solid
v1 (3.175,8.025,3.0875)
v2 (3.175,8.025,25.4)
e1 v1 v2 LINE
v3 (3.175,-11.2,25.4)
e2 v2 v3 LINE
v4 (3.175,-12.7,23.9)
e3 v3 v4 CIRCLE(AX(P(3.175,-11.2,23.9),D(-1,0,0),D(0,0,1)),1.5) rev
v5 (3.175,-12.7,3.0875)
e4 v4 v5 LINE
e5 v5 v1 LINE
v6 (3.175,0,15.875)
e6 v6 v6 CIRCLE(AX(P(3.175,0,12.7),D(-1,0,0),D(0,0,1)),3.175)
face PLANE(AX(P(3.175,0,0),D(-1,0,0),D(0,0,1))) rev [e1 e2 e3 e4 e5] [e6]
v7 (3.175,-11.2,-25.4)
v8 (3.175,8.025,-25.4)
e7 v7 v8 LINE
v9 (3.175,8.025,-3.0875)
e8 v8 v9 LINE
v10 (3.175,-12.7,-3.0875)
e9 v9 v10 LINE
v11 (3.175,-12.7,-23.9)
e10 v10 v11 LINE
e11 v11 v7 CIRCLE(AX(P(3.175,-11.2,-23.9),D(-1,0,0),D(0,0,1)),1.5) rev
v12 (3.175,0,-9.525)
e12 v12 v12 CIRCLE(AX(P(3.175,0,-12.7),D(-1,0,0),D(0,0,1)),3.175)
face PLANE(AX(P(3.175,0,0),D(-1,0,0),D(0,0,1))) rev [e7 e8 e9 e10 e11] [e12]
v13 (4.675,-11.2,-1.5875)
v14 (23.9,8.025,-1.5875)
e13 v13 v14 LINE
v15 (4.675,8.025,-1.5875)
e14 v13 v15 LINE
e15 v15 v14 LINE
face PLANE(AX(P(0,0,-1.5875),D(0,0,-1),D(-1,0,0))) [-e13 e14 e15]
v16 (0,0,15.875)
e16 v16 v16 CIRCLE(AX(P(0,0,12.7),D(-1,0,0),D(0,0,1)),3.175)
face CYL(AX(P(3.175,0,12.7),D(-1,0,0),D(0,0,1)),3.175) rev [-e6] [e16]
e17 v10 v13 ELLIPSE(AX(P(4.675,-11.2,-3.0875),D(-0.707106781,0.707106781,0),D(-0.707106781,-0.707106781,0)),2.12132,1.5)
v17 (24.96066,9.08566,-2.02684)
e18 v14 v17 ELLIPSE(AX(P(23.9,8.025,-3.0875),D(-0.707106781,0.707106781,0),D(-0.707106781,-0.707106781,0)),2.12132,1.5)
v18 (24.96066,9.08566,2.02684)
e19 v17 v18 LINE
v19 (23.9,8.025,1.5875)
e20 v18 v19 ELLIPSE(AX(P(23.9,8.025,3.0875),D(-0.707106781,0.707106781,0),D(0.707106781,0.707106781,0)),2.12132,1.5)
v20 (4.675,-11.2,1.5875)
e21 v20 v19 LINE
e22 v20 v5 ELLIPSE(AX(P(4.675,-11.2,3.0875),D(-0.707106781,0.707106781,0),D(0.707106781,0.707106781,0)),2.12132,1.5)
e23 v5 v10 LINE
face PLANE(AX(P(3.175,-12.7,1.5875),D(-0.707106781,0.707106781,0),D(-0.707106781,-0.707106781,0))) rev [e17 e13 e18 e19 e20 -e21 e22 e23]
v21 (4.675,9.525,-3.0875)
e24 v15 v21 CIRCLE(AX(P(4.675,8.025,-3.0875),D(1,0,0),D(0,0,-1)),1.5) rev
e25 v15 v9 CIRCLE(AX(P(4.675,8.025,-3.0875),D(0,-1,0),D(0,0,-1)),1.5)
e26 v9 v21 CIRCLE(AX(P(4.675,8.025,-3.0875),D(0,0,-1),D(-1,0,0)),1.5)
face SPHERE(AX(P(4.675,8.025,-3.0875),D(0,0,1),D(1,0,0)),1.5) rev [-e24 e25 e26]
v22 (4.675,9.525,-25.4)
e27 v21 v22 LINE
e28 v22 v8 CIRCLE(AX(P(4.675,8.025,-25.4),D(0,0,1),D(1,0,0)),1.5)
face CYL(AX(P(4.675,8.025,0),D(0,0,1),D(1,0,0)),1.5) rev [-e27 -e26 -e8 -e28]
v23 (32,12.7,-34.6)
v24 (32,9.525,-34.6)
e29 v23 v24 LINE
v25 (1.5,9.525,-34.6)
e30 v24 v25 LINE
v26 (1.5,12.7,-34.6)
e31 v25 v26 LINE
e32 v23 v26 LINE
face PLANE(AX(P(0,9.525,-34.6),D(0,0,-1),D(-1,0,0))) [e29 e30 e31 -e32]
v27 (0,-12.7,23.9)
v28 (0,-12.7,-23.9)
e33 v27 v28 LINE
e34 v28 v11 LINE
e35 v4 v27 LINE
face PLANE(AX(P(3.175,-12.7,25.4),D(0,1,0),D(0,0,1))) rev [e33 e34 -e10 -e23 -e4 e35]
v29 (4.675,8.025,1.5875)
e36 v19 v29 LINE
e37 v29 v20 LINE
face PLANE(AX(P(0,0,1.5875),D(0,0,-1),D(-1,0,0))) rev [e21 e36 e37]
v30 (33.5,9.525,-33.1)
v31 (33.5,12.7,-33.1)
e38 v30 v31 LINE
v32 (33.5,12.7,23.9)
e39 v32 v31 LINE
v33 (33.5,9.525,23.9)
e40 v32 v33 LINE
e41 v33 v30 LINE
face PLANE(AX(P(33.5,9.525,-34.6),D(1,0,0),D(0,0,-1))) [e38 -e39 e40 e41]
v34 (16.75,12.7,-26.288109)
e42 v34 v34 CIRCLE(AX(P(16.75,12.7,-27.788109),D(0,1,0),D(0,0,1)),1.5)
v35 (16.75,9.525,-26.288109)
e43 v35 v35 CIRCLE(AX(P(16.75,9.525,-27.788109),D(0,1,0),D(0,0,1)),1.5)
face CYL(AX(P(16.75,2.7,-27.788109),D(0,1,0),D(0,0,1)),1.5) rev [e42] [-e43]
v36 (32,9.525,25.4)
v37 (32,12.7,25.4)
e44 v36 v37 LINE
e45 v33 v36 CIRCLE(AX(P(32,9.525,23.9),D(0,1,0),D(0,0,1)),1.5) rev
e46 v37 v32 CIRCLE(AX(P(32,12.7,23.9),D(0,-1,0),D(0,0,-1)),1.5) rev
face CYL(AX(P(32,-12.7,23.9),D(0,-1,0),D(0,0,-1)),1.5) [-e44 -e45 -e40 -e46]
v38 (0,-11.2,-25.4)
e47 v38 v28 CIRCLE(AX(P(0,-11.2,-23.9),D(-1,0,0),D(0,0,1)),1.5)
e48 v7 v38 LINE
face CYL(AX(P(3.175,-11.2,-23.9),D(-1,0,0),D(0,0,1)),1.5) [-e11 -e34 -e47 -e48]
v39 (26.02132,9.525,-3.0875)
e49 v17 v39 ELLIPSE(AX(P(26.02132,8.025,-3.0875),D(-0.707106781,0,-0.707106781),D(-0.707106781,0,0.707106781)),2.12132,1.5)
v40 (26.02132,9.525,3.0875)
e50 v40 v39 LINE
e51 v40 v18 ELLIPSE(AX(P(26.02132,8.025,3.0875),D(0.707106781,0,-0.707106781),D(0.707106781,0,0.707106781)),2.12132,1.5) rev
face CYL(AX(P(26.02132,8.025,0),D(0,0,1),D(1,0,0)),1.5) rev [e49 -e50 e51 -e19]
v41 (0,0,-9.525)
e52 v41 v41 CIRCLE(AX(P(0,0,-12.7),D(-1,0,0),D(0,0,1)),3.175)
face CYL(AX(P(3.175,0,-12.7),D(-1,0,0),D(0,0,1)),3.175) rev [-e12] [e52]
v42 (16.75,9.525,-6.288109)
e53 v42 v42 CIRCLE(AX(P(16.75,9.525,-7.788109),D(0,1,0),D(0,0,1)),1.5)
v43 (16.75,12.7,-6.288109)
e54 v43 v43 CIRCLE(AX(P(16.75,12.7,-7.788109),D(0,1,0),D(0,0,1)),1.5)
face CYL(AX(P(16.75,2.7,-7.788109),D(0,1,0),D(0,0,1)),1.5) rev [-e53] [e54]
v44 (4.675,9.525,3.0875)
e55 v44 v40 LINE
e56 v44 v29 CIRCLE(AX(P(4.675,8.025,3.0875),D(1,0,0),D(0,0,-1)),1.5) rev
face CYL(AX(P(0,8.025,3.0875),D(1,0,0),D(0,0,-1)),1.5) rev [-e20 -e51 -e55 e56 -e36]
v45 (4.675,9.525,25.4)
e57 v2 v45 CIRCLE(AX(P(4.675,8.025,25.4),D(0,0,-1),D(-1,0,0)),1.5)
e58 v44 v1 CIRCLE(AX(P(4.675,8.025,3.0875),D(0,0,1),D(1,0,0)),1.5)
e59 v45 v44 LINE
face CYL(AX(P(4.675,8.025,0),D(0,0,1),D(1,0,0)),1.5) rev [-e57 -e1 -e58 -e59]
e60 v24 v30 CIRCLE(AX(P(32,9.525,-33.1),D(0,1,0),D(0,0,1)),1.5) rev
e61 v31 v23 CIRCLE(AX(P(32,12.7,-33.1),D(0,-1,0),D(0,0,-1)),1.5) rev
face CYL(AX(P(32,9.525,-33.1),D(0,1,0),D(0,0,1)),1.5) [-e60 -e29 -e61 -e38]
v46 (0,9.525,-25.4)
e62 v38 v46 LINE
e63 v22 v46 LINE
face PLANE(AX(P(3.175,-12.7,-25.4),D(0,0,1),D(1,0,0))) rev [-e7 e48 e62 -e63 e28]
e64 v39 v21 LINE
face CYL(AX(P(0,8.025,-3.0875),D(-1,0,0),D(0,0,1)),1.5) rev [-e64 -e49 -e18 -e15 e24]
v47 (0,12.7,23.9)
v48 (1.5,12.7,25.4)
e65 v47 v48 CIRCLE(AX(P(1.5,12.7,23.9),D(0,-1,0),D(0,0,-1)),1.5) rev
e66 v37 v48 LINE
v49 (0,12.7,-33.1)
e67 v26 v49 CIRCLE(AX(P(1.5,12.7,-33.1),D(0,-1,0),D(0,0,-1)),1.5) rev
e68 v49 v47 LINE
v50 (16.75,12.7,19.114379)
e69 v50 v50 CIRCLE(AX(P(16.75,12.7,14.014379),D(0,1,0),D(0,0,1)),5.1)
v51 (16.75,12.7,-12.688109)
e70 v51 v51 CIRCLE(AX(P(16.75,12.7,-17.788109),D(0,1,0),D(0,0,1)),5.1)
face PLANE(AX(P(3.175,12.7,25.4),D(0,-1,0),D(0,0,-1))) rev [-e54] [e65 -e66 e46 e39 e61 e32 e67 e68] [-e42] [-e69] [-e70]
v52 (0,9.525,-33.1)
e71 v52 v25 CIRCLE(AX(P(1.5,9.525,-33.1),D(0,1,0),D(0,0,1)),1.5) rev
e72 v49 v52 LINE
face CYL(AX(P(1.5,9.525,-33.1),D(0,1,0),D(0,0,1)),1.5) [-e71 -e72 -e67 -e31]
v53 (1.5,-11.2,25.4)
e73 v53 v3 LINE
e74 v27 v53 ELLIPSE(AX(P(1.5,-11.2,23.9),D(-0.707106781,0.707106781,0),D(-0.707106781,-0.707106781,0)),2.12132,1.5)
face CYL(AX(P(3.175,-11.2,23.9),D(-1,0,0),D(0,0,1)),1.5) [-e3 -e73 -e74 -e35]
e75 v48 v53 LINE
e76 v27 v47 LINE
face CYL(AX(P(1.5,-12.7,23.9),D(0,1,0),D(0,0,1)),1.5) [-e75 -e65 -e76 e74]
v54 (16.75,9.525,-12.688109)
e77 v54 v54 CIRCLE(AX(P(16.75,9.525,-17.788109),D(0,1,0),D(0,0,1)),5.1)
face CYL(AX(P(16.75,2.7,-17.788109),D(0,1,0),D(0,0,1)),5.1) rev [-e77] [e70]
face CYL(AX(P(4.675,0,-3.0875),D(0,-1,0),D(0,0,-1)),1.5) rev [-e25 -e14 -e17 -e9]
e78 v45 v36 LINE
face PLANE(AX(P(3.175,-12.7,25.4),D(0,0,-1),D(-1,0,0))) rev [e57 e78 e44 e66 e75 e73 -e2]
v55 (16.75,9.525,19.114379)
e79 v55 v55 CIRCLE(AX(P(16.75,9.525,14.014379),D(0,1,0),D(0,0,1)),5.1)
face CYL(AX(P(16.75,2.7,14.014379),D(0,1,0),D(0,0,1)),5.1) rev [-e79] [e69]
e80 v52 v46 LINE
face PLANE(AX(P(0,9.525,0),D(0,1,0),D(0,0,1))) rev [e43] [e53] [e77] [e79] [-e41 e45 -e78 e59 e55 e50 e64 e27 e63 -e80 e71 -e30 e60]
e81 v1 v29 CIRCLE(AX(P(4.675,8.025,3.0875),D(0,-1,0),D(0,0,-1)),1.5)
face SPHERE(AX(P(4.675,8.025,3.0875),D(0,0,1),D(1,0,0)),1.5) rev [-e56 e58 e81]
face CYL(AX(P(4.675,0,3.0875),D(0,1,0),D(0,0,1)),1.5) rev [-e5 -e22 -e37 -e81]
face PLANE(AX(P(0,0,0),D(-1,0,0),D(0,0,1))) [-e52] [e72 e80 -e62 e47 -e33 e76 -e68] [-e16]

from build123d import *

# Parameters (mm, degrees)
SKETCH2_W           = 50.8
SKETCH2_H           = 25.4
BOSS_EXTRUDE1_DEPTH = 3.175
SKETCH4_W           = 33.5
SKETCH4_H           = 60
BOSS_EXTRUDE2_DEPTH = 3.175
SKETCH6_R           = 3.175
CUT_EXTRUDE2_DEPTH  = 3.175
BOSS_EXTRUDE3_DEPTH = 1.5875
SKETCH8_R           = 5.1
SKETCH8_R_2         = 1.5
CUT_EXTRUDE3_DEPTH  = 10
FILLET3_R           = 1.5


with BuildPart() as part:
    # Sketch2 → Boss-Extrude1 (new body)
    with BuildSketch(Plane(origin=(0, 0, 0), x_dir=(0, 0, -1), z_dir=(1, 0, 0))):
        Rectangle(SKETCH2_W, SKETCH2_H)
    extrude(amount=BOSS_EXTRUDE1_DEPTH)

    # Sketch4 → Boss-Extrude2 (add)
    with BuildSketch(Plane(origin=(0, 12.7, 0), x_dir=(1, 0, 0), z_dir=(0, 1, 0))):
        with Locations((16.75, 4.6)):
            Rectangle(SKETCH4_W, SKETCH4_H)
    extrude(amount=-BOSS_EXTRUDE2_DEPTH)

    # Sketch6 → Cut-Extrude2 (cut)
    with BuildSketch(Plane.ZY):
        with Locations((-12.7, 0)):
            Circle(SKETCH6_R)
        with Locations((12.7, 0)):
            Circle(SKETCH6_R)
    extrude(amount=-CUT_EXTRUDE2_DEPTH, mode=Mode.SUBTRACT)

    # Sketch7 → Boss-Extrude3 (add, symmetric)
    with BuildSketch(Plane.XY):
        Polygon((3.175, -12.7), (25.4, 9.525), (3.175, 9.525), align=None)
    extrude(amount=BOSS_EXTRUDE3_DEPTH, both=True)

    # Sketch8 → Cut-Extrude3 (cut)
    with BuildSketch(Plane(origin=(0, 12.7, 0), x_dir=(1, 0, 0), z_dir=(0, 1, 0))):
        with Locations(Location((16.75, 17.788109286, 0), (0, 0, 270))):
            Circle(SKETCH8_R)
        with Locations(Location((16.75, 7.788109286, 0), (0, 0, 270))):
            Circle(SKETCH8_R_2)
        with Locations(Location((16.75, 27.788109286, 0), (0, 0, 270))):
            Circle(SKETCH8_R_2)
        with Locations(Location((16.75, -14.014379277, 0), (0, 0, 270))):
            Circle(SKETCH8_R)
    extrude(amount=-CUT_EXTRUDE3_DEPTH, mode=Mode.SUBTRACT)

    # Fillet3
    # the kernel refuses this fillet: 1.5 mm, written as the material it adds along each edge
    with BuildSketch(Plane(origin=(4.675, 8.025, 3.0875), x_dir=(-1, 0, 0), z_dir=(0, 1, 0))) as fillet3_piece_1_section:
        Polygon((0, 0), (FILLET3_R, 0), (FILLET3_R, -FILLET3_R), (0, -FILLET3_R), align=None)
    fillet3_piece_1 = extrude(amount=FILLET3_R, mode=Mode.PRIVATE)
    fillet3_piece_1 = fillet3_piece_1 - Plane(origin=(4.675, 8.025, 3.0875), x_dir=(0.7071067811865475, 0, 0.7071067811865475), z_dir=(0, 1, 0)) * Sphere(FILLET3_R, mode=Mode.PRIVATE)
    add(fillet3_piece_1)
    with BuildSketch(Plane(origin=(4.675, 8.025, -3.0875), x_dir=(-1, 0, 0), z_dir=(0, 1, 0))) as fillet3_piece_2_section:
        Polygon((0, 0), (FILLET3_R, 0), (FILLET3_R, FILLET3_R), (0, FILLET3_R), align=None)
    fillet3_piece_2 = extrude(amount=FILLET3_R, mode=Mode.PRIVATE)
    fillet3_piece_2 = fillet3_piece_2 - Plane(origin=(4.675, 8.025, -3.0875), x_dir=(0.7071067811865475, 0, -0.7071067811865475), z_dir=(0, 1, 0)) * Sphere(FILLET3_R, mode=Mode.PRIVATE)
    add(fillet3_piece_2)
    with BuildSketch(Plane(origin=(3.175, 9.525, 25.4), x_dir=(0, -1, 0), z_dir=(0, 0, -1)), Plane(origin=(3.175, 9.525, -3.0875), x_dir=(0, -1, 0), z_dir=(0, 0, -1))) as fillet3_piece_3:
        with BuildLine():
            CenterArc((FILLET3_R, -FILLET3_R), FILLET3_R, 90, 90)
            Line((0, -FILLET3_R), (0, 0))
            Line((0, 0), (FILLET3_R, 0))
        make_face()
    extrude(amount=22.3125)
    with BuildSketch(Plane(origin=(29.15, 9.525, -1.5875), x_dir=(0, 0, -1), z_dir=(-1, 0, 0))) as fillet3_piece_4_section:
        with BuildLine():
            CenterArc((FILLET3_R, FILLET3_R), FILLET3_R, 180, 90)
            Line((0, FILLET3_R), (0, 0))
            Line((0, 0), (FILLET3_R, 0))
        make_face()
    fillet3_piece_4 = extrude(amount=24.475, mode=Mode.PRIVATE)
    fillet3_piece_4 = split(fillet3_piece_4, bisect_by=Plane(origin=(19.967902823, 4.092902823, -1.930123153), z_dir=(-0.707106781186549, 0.707106781186546, 0)), keep=Keep.TOP, mode=Mode.PRIVATE)
    add(fillet3_piece_4)
    with BuildSketch(Plane(origin=(25.4, 9.525, -1.5875), x_dir=(-0.7071067811865489, -0.7071067811865461, 0), z_dir=(0, 0, 1))) as fillet3_piece_5:
        with BuildLine():
            CenterArc((FILLET3_R * 0.414213562373, FILLET3_R), FILLET3_R, 225, 45)
            Line((-FILLET3_R * 0.292893218813, FILLET3_R * 0.292893218813), (0, 0))
            Line((0, 0), (FILLET3_R * 0.414213562373, 0))
        make_face()
    extrude(amount=3.175)
    with BuildSketch(Plane(origin=(3.175, 8.025, -1.5875), x_dir=(0, 0, -1), z_dir=(0, -1, 0))) as fillet3_piece_6_section:
        with BuildLine():
            CenterArc((FILLET3_R, FILLET3_R), FILLET3_R, 180, 90)
            Line((0, FILLET3_R), (0, 0))
            Line((0, 0), (FILLET3_R, 0))
        make_face()
    fillet3_piece_6 = extrude(amount=20.725, mode=Mode.PRIVATE)
    fillet3_piece_6 = split(fillet3_piece_6, bisect_by=Plane(origin=(8.60741784, -7.26758216, -1.930100054), z_dir=(-0.707106781186549, 0.707106781186546, 0)), keep=Keep.TOP, mode=Mode.PRIVATE)
    add(fillet3_piece_6)
    with BuildSketch(Plane(origin=(29.15, 9.525, 1.5875), x_dir=(0, 0, 1), z_dir=(-1, 0, 0))) as fillet3_piece_7_section:
        with BuildLine():
            CenterArc((FILLET3_R, -FILLET3_R), FILLET3_R, 90, 90)
            Line((0, -FILLET3_R), (0, 0))
            Line((0, 0), (FILLET3_R, 0))
        make_face()
    fillet3_piece_7 = extrude(amount=24.475, mode=Mode.PRIVATE)
    fillet3_piece_7 = split(fillet3_piece_7, bisect_by=Plane(origin=(19.967902823, 4.092902823, 1.930123153), z_dir=(-0.707106781186549, 0.707106781186546, 0)), keep=Keep.TOP, mode=Mode.PRIVATE)
    add(fillet3_piece_7)
    with BuildSketch(Plane(origin=(3.175, 8.025, 1.5875), x_dir=(0, 0, 1), z_dir=(0, -1, 0))) as fillet3_piece_8_section:
        with BuildLine():
            CenterArc((FILLET3_R, -FILLET3_R), FILLET3_R, 90, 90)
            Line((0, -FILLET3_R), (0, 0))
            Line((0, 0), (FILLET3_R, 0))
        make_face()
    fillet3_piece_8 = extrude(amount=20.725, mode=Mode.PRIVATE)
    fillet3_piece_8 = split(fillet3_piece_8, bisect_by=Plane(origin=(8.60741784, -7.26758216, 1.930100054), z_dir=(-0.707106781186549, 0.707106781186546, 0)), keep=Keep.TOP, mode=Mode.PRIVATE)
    add(fillet3_piece_8)
    with BuildSketch(Plane(origin=(25.4, 9.525, -3.140800859), x_dir=(-0.7071067811865446, -0.7071067811865503, 0), z_dir=(0, 0, 1))) as fillet3_piece_9a_section:
        with BuildLine():
            CenterArc((FILLET3_R * 0.414213562373, FILLET3_R), FILLET3_R, 225, 45)
            Line((-FILLET3_R * 0.292893218813, FILLET3_R * 0.292893218813), (0, 0))
            Line((0, 0), (FILLET3_R * 0.414213562373, 0))
        make_face()
    fillet3_piece_9a = extrude(amount=4.728300859, mode=Mode.PRIVATE)
    fillet3_piece_9a = split(fillet3_piece_9a, bisect_by=Plane(origin=(25.438403899, 9.432284787, -1.5875), z_dir=(0, 0, -1)), keep=Keep.TOP, mode=Mode.PRIVATE)
    with BuildSketch(Plane(origin=(29.15, 9.525, -1.5875), x_dir=(0, 0, -1), z_dir=(-1, 0, 0))) as fillet3_piece_9b_section:
        with BuildLine():
            CenterArc((FILLET3_R, FILLET3_R), FILLET3_R, 180, 90)
            Line((0, FILLET3_R), (0, 0))
            Line((0, 0), (FILLET3_R, 0))
        make_face()
    fillet3_piece_9b = extrude(amount=24.475, mode=Mode.PRIVATE)
    fillet3_piece_9b = split(fillet3_piece_9b, bisect_by=Plane(origin=(26.063627713, 10.188627713, -1.91198662), z_dir=(0.707106781186549, -0.707106781186546, 0)), keep=Keep.TOP, mode=Mode.PRIVATE)
    fillet3_piece_9 = fillet3_piece_9a & fillet3_piece_9b
    add(fillet3_piece_9)
    with BuildSketch(Plane(origin=(25.4, 9.525, -1.5875), x_dir=(-0.7071067811865489, -0.7071067811865461, 0), z_dir=(0, 0, 1))) as fillet3_piece_10a_section:
        with BuildLine():
            CenterArc((FILLET3_R * 0.414213562373, FILLET3_R), FILLET3_R, 225, 45)
            Line((-FILLET3_R * 0.292893218813, FILLET3_R * 0.292893218813), (0, 0))
            Line((0, 0), (FILLET3_R * 0.414213562373, 0))
        make_face()
    fillet3_piece_10a = extrude(amount=4.728300859, mode=Mode.PRIVATE)
    fillet3_piece_10a = split(fillet3_piece_10a, bisect_by=Plane(origin=(25.438403899, 9.432284787, 1.5875), z_dir=(0, 0, 1)), keep=Keep.TOP, mode=Mode.PRIVATE)
    with BuildSketch(Plane(origin=(29.15, 9.525, 1.5875), x_dir=(0, 0, 1), z_dir=(-1, 0, 0))) as fillet3_piece_10b_section:
        with BuildLine():
            CenterArc((FILLET3_R, -FILLET3_R), FILLET3_R, 90, 90)
            Line((0, -FILLET3_R), (0, 0))
            Line((0, 0), (FILLET3_R, 0))
        make_face()
    fillet3_piece_10b = extrude(amount=24.475, mode=Mode.PRIVATE)
    fillet3_piece_10b = split(fillet3_piece_10b, bisect_by=Plane(origin=(26.063627713, 10.188627713, 1.91198662), z_dir=(0.707106781186549, -0.707106781186546, 0)), keep=Keep.TOP, mode=Mode.PRIVATE)
    fillet3_piece_10 = fillet3_piece_10a & fillet3_piece_10b
    add(fillet3_piece_10)
    # the kernel refuses this fillet: 1.5 mm, written as the material it takes off along each edge
    with BuildSketch(Plane(origin=(33.5, 16.45, 25.4), x_dir=(0, 0, -1), z_dir=(0, -1, 0)), Plane(origin=(0, 16.45, -34.6), x_dir=(0, 0, 1), z_dir=(0, -1, 0)), Plane(origin=(33.5, 16.45, -34.6), x_dir=(-1, 0, 0), z_dir=(0, -1, 0)), Plane(origin=(-3.75, -12.7, -25.4), x_dir=(0, 0, 1), z_dir=(1, 0, 0))) as fillet3_2_piece_1:
        with BuildLine():
            CenterArc((FILLET3_R, -FILLET3_R), FILLET3_R, 90, 90)
            Line((0, -FILLET3_R), (0, 0))
            Line((0, 0), (FILLET3_R, 0))
        make_face()
    extrude(amount=10.675, mode=Mode.SUBTRACT)
    with BuildSketch(Plane(origin=(0, 16.45, 25.4), x_dir=(0, 0, -1), z_dir=(0, -1, 0))) as fillet3_2_piece_2:
        with BuildLine():
            CenterArc((FILLET3_R, FILLET3_R), FILLET3_R, 180, 90)
            Line((0, FILLET3_R), (0, 0))
            Line((0, 0), (FILLET3_R, 0))
        make_face()
    extrude(amount=32.9, mode=Mode.SUBTRACT)
    with BuildSketch(Plane(origin=(-3.75, -12.7, 25.4), x_dir=(0, 0, -1), z_dir=(1, 0, 0))) as fillet3_2_piece_3:
        with BuildLine():
            CenterArc((FILLET3_R, FILLET3_R), FILLET3_R, 180, 90)
            Line((0, FILLET3_R), (0, 0))
            Line((0, 0), (FILLET3_R, 0))
        make_face()
    extrude(amount=10.675, mode=Mode.SUBTRACT)


solid = part.part
